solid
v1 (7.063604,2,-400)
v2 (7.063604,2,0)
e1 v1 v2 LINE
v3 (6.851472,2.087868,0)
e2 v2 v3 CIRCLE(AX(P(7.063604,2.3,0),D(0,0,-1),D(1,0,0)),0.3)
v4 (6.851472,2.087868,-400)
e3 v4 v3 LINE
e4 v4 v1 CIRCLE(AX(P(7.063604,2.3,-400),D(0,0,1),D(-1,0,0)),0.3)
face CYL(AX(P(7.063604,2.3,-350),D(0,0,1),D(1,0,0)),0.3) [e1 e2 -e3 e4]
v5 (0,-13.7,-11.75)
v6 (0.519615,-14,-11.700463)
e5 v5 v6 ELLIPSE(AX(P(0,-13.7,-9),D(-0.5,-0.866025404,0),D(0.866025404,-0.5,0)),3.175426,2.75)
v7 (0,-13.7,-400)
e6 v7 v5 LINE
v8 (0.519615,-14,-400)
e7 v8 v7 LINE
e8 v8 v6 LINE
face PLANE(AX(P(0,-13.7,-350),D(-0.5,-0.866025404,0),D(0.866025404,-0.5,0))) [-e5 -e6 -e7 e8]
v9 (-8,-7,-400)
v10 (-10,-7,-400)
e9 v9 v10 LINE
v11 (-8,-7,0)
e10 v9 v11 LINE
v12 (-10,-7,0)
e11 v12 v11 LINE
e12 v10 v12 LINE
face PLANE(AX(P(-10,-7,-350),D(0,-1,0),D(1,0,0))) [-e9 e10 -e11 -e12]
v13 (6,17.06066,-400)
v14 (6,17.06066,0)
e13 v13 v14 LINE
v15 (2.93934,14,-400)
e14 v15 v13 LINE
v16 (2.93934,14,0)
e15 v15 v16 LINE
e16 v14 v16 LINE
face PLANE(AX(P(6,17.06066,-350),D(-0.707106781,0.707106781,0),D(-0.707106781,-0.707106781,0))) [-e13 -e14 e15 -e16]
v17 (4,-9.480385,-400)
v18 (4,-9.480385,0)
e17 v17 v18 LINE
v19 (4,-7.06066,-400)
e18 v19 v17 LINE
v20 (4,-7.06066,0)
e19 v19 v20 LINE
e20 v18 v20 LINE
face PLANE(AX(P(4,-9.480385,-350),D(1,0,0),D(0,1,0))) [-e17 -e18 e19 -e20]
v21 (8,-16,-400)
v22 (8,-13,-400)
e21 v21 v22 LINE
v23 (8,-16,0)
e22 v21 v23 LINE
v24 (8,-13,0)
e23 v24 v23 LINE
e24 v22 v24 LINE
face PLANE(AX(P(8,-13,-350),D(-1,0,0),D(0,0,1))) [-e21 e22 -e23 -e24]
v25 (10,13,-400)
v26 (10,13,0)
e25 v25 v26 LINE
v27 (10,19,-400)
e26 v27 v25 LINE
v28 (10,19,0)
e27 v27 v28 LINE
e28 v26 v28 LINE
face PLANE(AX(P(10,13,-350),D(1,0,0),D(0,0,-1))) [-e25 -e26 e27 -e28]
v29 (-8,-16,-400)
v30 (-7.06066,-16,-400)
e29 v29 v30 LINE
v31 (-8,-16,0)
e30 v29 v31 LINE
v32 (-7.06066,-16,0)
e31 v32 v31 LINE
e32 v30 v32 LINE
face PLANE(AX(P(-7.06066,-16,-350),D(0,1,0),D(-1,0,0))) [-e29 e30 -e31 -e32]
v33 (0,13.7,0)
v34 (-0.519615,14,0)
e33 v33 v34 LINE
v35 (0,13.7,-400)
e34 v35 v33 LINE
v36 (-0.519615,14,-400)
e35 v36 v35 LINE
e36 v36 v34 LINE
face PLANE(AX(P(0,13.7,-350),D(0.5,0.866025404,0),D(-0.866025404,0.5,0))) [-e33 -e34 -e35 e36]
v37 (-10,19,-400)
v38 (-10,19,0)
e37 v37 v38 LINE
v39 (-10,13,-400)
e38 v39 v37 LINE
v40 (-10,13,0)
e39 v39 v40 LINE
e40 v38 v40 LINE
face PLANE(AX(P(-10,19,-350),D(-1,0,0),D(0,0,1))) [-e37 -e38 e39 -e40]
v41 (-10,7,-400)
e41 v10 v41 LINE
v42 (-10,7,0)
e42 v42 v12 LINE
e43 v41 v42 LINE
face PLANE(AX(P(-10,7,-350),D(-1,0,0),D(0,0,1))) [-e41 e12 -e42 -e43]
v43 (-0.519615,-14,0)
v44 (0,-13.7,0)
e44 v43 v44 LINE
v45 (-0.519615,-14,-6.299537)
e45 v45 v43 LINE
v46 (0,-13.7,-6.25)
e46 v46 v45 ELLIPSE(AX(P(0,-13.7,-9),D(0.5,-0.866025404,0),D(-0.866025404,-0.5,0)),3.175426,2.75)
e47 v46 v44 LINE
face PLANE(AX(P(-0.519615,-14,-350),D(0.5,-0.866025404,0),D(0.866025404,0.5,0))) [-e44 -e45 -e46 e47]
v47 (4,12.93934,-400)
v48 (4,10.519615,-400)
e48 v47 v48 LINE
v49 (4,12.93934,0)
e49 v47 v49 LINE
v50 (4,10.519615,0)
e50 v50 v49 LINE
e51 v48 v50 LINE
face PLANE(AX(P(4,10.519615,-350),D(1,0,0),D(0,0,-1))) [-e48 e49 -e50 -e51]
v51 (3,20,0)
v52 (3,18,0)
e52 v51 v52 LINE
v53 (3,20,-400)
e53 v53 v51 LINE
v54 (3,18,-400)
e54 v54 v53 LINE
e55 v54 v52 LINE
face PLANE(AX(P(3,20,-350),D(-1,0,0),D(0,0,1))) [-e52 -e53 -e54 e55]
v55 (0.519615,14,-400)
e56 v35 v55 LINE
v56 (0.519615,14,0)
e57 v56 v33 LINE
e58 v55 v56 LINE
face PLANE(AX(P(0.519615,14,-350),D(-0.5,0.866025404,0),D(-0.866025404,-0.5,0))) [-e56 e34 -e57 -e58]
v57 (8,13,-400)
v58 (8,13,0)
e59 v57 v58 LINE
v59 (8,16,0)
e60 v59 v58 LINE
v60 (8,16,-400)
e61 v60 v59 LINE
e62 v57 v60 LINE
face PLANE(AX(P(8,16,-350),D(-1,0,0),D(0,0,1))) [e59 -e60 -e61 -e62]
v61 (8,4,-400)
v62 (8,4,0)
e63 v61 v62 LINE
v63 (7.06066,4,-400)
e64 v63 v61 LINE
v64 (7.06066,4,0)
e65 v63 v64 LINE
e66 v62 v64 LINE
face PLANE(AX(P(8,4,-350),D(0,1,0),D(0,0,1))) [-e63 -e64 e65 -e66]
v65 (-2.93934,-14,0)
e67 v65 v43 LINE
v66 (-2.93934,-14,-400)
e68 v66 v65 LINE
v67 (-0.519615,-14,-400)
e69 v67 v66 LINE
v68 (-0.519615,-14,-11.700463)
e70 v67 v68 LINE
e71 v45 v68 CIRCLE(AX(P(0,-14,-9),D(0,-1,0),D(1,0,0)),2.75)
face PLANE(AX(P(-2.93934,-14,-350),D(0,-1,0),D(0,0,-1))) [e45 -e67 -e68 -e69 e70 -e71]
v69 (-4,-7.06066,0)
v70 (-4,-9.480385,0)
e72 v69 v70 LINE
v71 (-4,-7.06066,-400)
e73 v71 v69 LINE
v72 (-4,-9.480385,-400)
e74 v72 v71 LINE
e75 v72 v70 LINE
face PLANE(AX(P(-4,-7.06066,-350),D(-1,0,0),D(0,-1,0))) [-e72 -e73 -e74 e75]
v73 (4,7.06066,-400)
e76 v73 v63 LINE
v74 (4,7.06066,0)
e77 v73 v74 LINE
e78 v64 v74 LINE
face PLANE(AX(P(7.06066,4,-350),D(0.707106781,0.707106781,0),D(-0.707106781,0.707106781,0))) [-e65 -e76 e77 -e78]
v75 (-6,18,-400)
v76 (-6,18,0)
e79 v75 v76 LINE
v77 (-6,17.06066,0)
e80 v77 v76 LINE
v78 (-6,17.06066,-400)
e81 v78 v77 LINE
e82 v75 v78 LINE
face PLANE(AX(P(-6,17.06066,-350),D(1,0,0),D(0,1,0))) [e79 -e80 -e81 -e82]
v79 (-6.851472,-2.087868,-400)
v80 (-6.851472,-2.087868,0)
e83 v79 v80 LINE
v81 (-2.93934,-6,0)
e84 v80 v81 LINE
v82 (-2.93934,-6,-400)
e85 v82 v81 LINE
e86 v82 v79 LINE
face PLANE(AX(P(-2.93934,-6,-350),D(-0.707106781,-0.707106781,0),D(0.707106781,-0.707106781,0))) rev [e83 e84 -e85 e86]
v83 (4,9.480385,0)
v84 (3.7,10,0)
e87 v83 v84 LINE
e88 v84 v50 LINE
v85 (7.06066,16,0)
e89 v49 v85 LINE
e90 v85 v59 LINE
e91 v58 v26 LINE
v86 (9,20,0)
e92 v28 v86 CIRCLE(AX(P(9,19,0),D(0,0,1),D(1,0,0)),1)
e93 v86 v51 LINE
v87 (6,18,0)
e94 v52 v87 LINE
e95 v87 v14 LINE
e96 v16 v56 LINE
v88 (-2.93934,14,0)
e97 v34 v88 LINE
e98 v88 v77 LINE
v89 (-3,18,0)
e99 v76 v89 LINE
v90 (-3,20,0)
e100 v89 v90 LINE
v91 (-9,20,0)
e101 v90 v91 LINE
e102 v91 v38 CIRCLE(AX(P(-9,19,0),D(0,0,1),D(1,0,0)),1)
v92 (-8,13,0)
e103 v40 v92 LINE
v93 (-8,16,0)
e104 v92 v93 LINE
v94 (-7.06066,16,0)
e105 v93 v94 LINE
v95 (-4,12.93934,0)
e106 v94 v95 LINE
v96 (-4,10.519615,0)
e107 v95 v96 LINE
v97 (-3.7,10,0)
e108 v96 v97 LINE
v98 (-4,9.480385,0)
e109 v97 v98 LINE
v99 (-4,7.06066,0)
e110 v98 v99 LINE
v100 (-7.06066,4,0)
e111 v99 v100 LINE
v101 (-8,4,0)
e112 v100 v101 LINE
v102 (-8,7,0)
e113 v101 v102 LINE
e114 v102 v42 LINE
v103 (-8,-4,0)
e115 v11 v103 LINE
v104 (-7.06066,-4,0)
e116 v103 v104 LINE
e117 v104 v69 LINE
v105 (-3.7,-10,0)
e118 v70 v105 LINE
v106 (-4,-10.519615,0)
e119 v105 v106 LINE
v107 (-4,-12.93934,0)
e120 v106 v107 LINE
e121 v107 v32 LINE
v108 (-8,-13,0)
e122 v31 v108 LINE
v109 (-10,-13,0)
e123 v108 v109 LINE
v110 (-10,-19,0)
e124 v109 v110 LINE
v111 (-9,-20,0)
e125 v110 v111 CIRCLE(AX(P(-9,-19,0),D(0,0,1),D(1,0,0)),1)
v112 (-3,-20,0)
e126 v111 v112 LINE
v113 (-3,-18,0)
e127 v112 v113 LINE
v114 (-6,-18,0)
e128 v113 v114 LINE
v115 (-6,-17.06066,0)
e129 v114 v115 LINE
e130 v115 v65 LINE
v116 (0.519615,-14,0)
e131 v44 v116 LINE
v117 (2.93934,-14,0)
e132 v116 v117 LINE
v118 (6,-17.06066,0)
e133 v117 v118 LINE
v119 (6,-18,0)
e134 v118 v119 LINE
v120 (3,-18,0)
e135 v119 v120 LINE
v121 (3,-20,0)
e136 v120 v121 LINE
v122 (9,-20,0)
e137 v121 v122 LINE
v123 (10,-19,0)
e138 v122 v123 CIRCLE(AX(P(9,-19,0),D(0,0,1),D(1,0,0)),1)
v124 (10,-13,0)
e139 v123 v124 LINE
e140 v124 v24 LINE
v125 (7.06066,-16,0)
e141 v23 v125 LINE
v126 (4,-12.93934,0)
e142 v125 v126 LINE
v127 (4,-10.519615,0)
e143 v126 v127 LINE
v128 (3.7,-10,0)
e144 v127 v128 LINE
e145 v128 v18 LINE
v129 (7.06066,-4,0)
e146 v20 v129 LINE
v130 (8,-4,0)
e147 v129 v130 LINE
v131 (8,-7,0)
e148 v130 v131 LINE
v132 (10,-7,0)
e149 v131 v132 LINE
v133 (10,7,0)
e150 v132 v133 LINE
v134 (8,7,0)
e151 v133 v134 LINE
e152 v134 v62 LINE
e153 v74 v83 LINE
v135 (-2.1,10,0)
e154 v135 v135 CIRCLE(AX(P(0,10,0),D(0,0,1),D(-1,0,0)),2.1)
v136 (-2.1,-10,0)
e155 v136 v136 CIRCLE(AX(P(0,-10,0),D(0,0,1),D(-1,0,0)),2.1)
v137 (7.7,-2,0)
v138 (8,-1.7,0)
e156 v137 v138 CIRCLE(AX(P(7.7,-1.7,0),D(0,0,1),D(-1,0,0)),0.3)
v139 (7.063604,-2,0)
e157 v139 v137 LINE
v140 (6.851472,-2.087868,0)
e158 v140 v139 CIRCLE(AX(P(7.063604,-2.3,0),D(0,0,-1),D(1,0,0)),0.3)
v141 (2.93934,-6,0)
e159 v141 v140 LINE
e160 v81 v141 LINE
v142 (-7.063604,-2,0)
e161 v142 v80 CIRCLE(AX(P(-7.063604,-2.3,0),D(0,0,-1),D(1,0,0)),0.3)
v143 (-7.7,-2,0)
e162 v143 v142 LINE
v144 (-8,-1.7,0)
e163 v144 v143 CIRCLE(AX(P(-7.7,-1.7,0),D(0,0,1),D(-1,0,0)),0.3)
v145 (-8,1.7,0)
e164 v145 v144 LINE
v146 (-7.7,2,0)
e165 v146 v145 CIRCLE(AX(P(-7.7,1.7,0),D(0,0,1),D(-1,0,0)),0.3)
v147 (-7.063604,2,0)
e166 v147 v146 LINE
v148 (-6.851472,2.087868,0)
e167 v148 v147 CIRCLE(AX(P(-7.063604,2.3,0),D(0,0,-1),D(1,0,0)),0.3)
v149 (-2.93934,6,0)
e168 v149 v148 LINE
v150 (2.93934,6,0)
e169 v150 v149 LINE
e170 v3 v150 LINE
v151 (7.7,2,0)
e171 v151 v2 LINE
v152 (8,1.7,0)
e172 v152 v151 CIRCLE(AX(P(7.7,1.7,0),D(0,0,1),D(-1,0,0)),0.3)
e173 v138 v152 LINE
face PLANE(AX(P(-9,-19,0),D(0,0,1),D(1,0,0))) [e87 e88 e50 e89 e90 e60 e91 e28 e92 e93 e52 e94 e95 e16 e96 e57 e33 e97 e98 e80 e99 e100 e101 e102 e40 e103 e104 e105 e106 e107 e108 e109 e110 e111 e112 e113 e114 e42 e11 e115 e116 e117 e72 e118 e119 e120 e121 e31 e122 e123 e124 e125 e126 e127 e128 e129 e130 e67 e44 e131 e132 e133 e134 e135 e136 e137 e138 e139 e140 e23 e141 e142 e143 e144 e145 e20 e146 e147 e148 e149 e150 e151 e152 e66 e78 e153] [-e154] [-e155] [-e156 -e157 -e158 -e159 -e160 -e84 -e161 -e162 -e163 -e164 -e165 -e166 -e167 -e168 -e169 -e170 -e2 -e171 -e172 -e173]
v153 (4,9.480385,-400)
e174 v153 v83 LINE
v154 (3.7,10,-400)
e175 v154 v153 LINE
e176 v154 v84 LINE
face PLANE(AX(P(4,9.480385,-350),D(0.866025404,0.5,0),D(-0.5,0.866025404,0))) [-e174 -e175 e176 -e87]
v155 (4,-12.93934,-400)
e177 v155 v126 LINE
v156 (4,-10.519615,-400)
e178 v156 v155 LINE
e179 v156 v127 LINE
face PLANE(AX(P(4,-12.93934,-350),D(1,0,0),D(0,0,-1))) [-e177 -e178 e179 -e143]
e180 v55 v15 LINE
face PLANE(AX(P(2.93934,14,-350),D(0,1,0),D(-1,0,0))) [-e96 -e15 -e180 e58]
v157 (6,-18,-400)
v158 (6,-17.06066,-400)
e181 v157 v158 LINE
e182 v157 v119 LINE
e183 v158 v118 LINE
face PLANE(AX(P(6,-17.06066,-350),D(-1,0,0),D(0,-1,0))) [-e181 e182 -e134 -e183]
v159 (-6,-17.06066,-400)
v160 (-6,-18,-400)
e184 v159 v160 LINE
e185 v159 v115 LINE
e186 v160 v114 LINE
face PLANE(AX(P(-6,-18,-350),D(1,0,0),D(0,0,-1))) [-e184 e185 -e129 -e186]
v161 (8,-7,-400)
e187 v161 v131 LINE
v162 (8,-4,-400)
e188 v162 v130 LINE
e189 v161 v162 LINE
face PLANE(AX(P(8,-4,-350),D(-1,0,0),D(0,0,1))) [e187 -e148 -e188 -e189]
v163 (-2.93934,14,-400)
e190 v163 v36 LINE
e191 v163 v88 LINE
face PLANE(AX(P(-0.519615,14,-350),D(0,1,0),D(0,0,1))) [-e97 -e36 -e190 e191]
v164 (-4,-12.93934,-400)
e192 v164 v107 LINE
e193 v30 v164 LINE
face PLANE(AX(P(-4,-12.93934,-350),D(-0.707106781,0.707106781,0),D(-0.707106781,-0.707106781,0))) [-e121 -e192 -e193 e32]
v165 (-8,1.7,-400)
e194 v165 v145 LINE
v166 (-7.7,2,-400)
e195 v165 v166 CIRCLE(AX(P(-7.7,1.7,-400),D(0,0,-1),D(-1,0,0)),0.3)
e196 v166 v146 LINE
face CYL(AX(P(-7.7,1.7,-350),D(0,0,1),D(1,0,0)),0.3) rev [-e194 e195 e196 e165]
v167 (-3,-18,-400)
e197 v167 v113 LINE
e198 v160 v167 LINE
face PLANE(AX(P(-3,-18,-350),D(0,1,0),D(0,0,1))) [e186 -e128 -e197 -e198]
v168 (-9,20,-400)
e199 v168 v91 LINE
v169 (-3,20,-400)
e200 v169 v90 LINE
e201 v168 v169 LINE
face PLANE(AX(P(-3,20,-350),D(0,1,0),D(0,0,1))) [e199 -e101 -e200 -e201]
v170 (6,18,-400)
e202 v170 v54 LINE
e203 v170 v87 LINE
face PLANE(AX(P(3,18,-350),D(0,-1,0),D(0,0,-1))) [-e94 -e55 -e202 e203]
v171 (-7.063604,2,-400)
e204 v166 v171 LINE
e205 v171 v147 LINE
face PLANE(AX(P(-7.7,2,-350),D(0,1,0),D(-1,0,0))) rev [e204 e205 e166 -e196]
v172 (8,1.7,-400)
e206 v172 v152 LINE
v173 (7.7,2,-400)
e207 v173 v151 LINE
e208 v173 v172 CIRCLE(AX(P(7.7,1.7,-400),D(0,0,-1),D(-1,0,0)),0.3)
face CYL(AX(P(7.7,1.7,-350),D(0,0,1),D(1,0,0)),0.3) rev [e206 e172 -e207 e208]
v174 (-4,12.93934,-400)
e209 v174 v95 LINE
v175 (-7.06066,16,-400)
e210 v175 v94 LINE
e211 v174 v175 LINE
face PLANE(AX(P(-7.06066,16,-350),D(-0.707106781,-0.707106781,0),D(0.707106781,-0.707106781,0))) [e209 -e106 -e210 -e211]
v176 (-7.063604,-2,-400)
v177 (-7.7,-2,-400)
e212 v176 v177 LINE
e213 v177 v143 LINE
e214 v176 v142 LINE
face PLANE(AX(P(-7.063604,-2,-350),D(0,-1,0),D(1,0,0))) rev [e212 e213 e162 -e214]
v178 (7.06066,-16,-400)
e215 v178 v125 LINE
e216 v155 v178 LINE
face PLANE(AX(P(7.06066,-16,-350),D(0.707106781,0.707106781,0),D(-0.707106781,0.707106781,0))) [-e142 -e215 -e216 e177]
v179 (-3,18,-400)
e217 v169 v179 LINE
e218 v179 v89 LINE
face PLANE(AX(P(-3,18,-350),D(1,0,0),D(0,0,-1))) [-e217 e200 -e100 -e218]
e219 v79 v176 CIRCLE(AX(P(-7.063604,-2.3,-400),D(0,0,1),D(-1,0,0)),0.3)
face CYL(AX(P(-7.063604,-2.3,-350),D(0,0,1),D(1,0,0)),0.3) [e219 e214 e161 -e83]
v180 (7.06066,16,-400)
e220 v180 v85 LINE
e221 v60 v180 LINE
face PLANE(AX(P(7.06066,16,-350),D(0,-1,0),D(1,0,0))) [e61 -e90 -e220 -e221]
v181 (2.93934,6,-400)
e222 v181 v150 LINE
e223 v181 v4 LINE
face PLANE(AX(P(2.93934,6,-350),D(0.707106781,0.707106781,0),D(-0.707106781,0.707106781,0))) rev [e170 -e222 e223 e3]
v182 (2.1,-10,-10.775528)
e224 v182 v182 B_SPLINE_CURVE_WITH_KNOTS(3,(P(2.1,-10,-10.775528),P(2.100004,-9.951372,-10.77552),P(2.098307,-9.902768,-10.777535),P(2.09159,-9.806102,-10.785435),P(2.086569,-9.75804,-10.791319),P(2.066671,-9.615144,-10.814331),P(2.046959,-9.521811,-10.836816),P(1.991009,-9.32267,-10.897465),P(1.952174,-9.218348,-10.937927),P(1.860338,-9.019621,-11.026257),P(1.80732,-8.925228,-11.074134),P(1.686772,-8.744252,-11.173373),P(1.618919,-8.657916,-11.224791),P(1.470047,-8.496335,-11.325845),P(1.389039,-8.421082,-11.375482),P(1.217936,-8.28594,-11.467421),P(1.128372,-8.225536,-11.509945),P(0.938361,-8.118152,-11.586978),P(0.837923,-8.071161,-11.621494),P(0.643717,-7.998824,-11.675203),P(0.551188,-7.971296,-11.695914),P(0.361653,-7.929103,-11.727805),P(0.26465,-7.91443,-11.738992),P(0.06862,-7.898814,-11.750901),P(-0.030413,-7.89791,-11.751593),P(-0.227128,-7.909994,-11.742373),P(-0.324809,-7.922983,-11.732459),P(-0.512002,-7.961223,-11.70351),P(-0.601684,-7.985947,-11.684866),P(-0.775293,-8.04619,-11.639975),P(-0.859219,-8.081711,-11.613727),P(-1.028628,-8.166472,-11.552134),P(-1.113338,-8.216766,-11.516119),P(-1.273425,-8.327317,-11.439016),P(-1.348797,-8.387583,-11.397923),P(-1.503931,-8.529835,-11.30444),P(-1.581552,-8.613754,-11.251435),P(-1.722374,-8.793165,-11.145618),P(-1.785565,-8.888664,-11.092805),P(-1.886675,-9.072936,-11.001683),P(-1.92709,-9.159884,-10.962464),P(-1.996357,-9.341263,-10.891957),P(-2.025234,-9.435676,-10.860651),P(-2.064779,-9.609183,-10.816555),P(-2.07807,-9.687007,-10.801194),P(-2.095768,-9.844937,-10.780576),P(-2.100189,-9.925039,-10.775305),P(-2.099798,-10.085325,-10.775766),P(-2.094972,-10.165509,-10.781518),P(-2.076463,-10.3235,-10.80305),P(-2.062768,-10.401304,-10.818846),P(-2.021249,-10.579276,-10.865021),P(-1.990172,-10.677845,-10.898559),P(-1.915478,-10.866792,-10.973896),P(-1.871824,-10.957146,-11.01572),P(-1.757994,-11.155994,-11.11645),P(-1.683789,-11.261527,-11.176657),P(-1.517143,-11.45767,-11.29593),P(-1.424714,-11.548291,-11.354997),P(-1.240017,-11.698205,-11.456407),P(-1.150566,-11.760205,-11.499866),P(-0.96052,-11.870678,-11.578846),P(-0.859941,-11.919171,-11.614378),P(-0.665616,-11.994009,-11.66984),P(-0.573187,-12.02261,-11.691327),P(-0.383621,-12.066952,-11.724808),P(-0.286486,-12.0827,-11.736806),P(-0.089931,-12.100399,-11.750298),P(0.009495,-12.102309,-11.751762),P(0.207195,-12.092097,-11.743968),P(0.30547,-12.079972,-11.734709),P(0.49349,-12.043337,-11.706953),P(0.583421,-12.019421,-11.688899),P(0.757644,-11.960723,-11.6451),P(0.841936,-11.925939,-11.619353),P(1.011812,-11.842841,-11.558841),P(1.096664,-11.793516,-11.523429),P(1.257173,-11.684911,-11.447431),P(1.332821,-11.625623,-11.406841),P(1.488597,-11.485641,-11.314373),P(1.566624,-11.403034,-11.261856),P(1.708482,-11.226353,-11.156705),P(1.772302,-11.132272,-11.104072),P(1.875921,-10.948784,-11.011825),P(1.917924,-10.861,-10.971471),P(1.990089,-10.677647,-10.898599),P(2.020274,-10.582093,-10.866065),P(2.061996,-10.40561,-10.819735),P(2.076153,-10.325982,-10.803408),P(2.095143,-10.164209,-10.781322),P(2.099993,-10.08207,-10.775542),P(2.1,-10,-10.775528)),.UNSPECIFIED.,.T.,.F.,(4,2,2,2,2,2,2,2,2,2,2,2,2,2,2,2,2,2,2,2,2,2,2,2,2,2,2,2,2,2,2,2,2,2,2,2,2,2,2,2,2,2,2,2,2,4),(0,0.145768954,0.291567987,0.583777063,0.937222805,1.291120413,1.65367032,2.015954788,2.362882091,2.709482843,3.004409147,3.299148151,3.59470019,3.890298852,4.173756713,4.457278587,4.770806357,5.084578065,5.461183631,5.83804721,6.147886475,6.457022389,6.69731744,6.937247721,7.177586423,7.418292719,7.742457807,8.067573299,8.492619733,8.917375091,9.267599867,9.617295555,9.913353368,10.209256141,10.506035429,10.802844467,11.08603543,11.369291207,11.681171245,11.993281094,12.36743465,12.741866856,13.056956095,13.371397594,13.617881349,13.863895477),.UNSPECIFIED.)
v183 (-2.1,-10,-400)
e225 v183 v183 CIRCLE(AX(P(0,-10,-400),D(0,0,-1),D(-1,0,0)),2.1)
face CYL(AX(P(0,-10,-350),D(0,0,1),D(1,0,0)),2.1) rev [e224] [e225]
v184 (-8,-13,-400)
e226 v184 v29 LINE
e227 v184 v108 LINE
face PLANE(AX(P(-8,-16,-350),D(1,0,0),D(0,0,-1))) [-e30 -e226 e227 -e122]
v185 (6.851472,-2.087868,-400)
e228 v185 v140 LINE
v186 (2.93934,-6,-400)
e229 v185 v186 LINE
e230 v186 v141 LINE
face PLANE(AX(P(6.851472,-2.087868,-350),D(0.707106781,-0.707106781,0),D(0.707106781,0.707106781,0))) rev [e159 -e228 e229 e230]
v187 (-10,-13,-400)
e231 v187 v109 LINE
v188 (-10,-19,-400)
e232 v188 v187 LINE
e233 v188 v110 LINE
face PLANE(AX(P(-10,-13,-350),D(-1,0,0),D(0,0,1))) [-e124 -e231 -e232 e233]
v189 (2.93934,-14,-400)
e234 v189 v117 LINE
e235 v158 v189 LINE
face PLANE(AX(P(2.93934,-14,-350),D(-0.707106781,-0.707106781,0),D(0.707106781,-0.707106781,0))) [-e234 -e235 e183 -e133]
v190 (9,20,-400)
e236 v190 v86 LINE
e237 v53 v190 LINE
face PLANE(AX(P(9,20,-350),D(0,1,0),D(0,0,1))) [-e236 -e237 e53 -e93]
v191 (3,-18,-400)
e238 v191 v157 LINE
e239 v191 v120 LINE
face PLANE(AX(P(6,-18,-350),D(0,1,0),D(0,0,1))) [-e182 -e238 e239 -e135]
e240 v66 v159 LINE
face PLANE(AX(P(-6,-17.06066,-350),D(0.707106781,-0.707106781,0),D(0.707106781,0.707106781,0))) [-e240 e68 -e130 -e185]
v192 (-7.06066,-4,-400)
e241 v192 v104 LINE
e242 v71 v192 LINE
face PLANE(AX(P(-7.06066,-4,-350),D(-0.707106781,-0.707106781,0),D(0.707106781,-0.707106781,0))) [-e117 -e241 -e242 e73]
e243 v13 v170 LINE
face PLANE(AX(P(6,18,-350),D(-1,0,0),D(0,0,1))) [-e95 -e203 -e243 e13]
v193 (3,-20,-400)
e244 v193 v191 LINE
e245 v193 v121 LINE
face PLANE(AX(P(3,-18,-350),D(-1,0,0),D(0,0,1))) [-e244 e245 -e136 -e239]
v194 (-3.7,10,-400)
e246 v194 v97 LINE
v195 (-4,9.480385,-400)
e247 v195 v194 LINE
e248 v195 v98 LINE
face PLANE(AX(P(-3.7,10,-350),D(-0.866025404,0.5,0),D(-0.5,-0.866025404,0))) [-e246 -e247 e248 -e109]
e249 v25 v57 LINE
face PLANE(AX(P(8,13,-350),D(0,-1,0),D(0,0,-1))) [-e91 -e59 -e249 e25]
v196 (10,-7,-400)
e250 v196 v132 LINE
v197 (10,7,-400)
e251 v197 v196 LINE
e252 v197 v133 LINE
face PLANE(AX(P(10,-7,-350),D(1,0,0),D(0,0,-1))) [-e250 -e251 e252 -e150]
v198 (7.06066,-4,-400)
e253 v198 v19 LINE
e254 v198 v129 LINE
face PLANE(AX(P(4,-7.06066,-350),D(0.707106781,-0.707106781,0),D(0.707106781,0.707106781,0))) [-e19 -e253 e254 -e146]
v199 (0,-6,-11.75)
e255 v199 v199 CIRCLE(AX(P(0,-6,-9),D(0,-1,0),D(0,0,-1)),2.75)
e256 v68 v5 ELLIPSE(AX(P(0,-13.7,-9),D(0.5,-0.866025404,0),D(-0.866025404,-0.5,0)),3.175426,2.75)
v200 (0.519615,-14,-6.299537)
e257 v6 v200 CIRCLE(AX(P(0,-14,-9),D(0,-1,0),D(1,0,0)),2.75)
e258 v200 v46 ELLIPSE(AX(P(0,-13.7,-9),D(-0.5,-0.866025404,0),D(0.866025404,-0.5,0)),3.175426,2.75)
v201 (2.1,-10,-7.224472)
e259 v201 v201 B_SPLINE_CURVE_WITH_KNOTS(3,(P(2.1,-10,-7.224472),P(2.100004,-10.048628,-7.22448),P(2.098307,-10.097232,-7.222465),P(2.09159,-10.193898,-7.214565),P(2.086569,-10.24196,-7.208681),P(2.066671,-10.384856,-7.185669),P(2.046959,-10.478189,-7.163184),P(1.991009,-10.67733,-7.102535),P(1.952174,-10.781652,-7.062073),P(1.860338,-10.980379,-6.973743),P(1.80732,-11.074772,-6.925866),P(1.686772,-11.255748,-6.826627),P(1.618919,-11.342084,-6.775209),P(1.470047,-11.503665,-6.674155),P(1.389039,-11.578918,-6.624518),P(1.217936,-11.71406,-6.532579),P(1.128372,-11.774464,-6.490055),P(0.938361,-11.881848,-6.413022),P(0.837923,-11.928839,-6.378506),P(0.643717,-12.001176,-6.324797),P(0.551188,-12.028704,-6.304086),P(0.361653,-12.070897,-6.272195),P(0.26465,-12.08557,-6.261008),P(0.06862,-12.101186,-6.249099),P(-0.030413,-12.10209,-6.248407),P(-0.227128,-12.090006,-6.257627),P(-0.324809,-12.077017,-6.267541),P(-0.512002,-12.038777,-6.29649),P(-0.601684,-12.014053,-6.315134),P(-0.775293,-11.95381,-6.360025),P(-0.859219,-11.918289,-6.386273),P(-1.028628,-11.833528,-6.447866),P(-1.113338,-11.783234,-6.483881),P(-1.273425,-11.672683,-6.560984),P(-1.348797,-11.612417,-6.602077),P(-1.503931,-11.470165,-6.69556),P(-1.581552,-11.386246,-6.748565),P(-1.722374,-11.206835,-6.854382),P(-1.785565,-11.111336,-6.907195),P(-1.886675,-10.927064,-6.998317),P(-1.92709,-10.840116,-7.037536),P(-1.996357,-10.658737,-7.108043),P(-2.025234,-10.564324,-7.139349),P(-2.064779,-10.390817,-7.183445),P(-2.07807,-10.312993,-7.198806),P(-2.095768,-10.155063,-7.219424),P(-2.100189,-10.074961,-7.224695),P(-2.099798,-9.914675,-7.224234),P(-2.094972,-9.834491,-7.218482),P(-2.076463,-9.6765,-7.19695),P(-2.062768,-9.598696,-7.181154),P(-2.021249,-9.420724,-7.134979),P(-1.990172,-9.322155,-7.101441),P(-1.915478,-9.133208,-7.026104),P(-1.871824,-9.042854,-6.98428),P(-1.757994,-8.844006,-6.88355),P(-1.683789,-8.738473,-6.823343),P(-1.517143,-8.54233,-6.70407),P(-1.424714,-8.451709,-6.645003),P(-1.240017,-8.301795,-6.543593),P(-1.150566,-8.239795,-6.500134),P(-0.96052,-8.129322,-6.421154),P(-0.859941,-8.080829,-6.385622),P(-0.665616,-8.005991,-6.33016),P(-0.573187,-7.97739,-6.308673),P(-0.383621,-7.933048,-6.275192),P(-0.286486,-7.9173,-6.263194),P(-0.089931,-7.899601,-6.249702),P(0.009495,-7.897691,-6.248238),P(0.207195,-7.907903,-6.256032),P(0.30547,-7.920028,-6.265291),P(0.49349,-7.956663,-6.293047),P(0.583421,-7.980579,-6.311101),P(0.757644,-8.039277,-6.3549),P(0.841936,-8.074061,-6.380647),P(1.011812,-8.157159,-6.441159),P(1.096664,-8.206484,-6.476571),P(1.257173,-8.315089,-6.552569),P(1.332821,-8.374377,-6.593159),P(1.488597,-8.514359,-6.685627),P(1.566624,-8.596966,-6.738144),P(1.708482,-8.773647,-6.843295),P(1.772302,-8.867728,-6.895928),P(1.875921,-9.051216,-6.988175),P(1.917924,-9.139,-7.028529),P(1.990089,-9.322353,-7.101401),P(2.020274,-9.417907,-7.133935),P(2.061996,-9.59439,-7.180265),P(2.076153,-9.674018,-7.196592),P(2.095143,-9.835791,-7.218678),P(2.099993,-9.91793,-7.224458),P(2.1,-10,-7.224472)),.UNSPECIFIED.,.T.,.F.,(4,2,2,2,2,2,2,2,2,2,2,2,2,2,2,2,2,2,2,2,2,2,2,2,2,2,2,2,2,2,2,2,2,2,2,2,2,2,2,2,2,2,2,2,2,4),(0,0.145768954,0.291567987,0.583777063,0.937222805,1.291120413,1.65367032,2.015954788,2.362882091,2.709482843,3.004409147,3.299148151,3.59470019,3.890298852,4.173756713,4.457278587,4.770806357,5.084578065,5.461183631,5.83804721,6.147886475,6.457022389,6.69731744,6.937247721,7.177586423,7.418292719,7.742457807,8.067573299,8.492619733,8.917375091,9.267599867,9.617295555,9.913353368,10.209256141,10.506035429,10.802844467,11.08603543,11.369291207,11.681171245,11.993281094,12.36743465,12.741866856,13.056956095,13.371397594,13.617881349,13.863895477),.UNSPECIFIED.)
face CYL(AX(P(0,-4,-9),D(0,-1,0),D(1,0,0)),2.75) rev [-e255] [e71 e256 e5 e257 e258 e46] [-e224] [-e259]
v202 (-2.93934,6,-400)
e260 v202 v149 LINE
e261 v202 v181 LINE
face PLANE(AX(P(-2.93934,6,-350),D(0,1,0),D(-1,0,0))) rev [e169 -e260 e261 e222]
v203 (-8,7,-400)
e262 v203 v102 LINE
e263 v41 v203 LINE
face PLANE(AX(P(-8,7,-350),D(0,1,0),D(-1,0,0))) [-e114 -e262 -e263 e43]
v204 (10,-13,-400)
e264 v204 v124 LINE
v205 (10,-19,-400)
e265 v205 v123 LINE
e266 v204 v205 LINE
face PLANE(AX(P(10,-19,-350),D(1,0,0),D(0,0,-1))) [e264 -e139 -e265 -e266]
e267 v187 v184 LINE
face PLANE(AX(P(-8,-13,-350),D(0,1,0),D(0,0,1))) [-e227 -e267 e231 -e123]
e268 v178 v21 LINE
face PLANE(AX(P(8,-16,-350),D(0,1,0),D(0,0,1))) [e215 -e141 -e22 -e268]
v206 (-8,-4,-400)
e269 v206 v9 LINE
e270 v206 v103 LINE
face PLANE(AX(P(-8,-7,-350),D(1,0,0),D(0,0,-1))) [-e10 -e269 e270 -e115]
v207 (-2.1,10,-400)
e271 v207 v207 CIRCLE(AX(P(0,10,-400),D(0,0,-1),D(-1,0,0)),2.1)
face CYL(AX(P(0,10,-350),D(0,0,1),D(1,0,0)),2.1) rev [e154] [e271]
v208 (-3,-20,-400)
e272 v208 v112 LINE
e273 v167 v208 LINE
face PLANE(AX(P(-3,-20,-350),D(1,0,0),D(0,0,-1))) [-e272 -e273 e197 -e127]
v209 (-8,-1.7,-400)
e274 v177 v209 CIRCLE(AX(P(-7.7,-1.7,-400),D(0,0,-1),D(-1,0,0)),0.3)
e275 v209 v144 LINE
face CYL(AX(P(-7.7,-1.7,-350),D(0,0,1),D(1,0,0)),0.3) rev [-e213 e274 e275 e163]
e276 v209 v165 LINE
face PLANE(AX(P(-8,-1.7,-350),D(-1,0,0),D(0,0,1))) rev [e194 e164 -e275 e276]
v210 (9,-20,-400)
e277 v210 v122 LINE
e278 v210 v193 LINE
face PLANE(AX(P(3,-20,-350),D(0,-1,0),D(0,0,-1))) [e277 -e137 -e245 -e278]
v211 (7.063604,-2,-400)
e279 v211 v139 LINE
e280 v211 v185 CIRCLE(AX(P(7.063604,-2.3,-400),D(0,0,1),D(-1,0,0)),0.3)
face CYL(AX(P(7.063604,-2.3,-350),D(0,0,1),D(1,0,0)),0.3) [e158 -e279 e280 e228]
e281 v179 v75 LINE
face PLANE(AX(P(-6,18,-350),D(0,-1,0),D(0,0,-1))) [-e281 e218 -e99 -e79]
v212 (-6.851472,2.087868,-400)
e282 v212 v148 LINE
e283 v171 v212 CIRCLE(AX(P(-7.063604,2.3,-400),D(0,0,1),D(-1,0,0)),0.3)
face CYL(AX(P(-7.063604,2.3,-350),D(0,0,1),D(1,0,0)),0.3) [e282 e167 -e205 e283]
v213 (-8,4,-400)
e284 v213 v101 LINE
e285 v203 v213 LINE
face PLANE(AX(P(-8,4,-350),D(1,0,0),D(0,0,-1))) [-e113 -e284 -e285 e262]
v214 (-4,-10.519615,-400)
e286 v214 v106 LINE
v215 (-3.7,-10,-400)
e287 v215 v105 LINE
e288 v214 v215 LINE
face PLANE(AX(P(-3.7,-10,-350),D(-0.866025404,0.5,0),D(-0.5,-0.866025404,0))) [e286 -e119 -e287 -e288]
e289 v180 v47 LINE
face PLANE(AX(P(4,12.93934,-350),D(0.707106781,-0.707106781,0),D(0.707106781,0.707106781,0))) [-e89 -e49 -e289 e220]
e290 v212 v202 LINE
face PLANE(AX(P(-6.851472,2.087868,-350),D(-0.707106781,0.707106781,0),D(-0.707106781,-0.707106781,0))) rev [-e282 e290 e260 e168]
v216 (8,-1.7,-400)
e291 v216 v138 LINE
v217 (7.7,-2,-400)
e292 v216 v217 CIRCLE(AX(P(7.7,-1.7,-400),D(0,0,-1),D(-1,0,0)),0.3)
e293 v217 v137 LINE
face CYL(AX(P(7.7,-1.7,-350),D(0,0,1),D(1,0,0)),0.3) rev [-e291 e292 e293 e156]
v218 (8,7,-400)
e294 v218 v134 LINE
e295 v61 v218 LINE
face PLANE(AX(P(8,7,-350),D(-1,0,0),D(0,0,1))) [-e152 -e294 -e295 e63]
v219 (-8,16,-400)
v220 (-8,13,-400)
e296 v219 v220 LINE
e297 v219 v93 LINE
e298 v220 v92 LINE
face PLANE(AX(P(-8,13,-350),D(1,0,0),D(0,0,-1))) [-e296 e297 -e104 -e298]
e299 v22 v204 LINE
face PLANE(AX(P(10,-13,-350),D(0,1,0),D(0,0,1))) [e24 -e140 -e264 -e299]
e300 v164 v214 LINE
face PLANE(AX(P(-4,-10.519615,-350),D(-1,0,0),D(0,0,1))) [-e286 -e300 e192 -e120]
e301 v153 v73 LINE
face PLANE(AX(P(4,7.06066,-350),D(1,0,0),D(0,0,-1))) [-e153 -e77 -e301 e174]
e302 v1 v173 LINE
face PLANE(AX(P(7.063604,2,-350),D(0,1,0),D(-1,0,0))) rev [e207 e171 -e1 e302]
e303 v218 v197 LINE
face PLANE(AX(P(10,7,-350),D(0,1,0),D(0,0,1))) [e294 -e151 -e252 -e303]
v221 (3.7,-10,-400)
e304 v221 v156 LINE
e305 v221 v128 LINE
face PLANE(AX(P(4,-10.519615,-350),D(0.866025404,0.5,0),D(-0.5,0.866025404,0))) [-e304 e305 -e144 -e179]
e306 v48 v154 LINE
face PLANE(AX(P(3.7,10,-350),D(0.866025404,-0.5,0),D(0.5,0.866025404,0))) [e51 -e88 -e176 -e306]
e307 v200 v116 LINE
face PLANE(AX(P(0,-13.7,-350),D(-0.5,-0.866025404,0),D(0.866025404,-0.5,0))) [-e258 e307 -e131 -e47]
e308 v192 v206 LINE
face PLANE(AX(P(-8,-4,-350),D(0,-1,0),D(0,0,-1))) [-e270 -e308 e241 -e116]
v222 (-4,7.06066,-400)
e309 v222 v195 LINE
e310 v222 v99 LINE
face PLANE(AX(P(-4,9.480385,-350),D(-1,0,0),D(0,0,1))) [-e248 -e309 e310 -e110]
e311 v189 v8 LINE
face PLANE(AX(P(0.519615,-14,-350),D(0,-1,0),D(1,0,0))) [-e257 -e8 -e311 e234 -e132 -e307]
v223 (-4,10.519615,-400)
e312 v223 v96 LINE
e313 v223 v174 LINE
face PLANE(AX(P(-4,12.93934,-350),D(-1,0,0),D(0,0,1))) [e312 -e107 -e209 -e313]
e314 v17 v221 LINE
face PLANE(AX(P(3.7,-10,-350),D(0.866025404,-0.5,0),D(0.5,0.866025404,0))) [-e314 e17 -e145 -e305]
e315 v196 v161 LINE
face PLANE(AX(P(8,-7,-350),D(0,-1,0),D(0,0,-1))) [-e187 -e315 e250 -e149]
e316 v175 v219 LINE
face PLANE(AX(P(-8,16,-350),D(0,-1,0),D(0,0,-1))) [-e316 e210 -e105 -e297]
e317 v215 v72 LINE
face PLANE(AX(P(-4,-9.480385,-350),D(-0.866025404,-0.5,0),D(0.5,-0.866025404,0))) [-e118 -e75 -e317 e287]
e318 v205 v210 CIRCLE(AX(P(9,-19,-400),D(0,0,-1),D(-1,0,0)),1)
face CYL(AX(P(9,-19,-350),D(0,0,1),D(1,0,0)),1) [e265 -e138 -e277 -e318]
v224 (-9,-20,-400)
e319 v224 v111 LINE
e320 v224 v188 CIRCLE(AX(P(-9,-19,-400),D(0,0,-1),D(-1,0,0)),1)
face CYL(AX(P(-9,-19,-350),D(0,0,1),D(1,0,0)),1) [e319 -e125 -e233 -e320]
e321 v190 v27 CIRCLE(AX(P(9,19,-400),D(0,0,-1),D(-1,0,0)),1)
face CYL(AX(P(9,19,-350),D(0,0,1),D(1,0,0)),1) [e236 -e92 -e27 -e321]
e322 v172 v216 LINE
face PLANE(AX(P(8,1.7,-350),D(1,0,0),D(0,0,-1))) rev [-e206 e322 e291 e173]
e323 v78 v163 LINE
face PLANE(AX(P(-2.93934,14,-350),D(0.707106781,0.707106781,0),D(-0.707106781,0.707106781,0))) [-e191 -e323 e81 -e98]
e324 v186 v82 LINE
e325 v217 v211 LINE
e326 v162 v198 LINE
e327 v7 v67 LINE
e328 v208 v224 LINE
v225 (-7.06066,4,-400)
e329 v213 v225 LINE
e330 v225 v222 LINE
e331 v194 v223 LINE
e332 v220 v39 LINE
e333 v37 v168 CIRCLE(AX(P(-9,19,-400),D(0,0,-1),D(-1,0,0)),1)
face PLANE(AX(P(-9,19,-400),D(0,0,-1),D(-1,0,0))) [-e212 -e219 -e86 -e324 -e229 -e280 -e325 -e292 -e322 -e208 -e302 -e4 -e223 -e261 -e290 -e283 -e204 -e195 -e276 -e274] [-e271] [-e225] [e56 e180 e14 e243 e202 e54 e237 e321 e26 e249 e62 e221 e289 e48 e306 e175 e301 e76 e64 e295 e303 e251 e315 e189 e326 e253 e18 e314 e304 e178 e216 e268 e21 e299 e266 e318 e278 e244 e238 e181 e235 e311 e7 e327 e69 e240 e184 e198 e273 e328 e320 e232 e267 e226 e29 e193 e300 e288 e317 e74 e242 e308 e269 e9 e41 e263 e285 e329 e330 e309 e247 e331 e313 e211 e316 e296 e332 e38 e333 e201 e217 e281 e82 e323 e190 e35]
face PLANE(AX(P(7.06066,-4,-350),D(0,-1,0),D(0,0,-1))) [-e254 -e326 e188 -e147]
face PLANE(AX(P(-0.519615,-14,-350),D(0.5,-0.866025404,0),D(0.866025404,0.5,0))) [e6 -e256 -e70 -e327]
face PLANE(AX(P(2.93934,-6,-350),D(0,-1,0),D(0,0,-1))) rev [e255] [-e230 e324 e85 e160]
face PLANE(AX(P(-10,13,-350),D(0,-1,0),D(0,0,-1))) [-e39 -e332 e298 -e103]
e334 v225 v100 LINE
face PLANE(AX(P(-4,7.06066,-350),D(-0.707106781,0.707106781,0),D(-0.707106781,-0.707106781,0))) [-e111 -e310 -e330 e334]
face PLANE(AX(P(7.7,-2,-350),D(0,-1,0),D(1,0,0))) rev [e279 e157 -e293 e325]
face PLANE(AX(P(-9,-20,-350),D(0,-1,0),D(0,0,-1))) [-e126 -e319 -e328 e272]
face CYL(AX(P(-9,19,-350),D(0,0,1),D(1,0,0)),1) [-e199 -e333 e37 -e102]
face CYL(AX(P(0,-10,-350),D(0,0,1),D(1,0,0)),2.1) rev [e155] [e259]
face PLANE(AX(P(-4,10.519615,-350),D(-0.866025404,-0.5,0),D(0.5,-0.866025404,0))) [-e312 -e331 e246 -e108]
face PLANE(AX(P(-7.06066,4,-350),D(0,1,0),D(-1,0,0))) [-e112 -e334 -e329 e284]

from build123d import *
from build123d.topology import SkipClean

# Parameters (mm, degrees)
SKETCH1_R           = 2.1
BOSS_EXTRUDE1_DEPTH = 350
SKETCH3_R           = 2.75
CUT_EXTRUDE1_DEPTH  = 10
SKETCH4_R           = 2.1
BOSS_EXTRUDE2_DEPTH = 50


with BuildPart() as part:
    # Sketch1 → Boss-Extrude1 (new body)
    with BuildSketch(Plane.XY):
        with BuildLine():
            Line((-8, 4), (-8, 7))
            Line((-8, 7), (-10, 7))
            Line((-10, 7), (-10, -7))
            Line((-10, -7), (-8, -7))
            Line((-8, -7), (-8, -4))
            Line((-8, -4), (-7.060660172, -4))
            Line((-7.060660172, -4), (-4, -7.060660172))
            Line((-4, -7.060660172), (-4, -9.480384758))
            Line((-4, -9.480384758), (-3.7, -10))
            Line((-3.7, -10), (-4, -10.519615242))
            Line((-4, -10.519615242), (-4, -12.939339828))
            Line((-4, -12.939339828), (-7.060660172, -16))
            Line((-7.060660172, -16), (-8, -16))
            Line((-8, -16), (-8, -13))
            Line((-8, -13), (-10, -13))
            Line((-10, -13), (-10, -19))
            ThreePointArc((-10, -19), (-9.707106781, -19.707106781), (-9, -20))
            Line((-9, -20), (-3, -20))
            Line((-3, -20), (-3, -18))
            Line((-3, -18), (-6, -18))
            Line((-6, -18), (-6, -17.060660172))
            Line((-6, -17.060660172), (-2.939339828, -14))
            Line((-2.939339828, -14), (-0.519615242, -14))
            Line((-0.519615242, -14), (0, -13.7))
            Line((0, -13.7), (0.519615242, -14))
            Line((0.519615242, -14), (2.939339828, -14))
            Line((2.939339828, -14), (6, -17.060660172))
            Line((6, -17.060660172), (6, -18))
            Line((6, -18), (3, -18))
            Line((3, -18), (3, -20))
            Line((3, -20), (9, -20))
            ThreePointArc((9, -20), (9.707106781, -19.707106781), (10, -19))
            Line((10, -19), (10, -13))
            Line((10, -13), (8, -13))
            Line((8, -13), (8, -16))
            Line((8, -16), (7.060660172, -16))
            Line((7.060660172, -16), (4, -12.939339828))
            Line((4, -12.939339828), (4, -10.519615242))
            Line((4, -10.519615242), (3.7, -10))
            Line((3.7, -10), (4, -9.480384758))
            Line((4, -9.480384758), (4, -7.060660172))
            Line((4, -7.060660172), (7.060660172, -4))
            Line((7.060660172, -4), (8, -4))
            Line((8, -4), (8, -7))
            Line((8, -7), (10, -7))
            Line((10, -7), (10, 7))
            Line((10, 7), (8, 7))
            Line((8, 7), (8, 4))
            Line((8, 4), (7.060660172, 4))
            Line((7.060660172, 4), (4, 7.060660172))
            Line((4, 7.060660172), (4, 9.480384758))
            Line((4, 9.480384758), (3.7, 10))
            Line((3.7, 10), (4, 10.519615242))
            Line((4, 10.519615242), (4, 12.939339828))
            Line((4, 12.939339828), (7.060660172, 16))
            Line((7.060660172, 16), (8, 16))
            Line((8, 16), (8, 13))
            Line((8, 13), (10, 13))
            Line((10, 13), (10, 19))
            ThreePointArc((10, 19), (9.707106781, 19.707106781), (9, 20))
            Line((9, 20), (3, 20))
            Line((3, 20), (3, 18))
            Line((3, 18), (6, 18))
            Line((6, 18), (6, 17.060660172))
            Line((6, 17.060660172), (2.939339828, 14))
            Line((2.939339828, 14), (0.519615242, 14))
            Line((0.519615242, 14), (0, 13.7))
            Line((0, 13.7), (-0.519615242, 14))
            Line((-0.519615242, 14), (-2.939339828, 14))
            Line((-2.939339828, 14), (-6, 17.060660172))
            Line((-6, 17.060660172), (-6, 18))
            Line((-6, 18), (-3, 18))
            Line((-3, 18), (-3, 20))
            Line((-3, 20), (-9, 20))
            ThreePointArc((-9, 20), (-9.707106781, 19.707106781), (-10, 19))
            Line((-10, 19), (-10, 13))
            Line((-10, 13), (-8, 13))
            Line((-8, 13), (-8, 16))
            Line((-8, 16), (-7.060660172, 16))
            Line((-7.060660172, 16), (-4, 12.939339828))
            Line((-4, 12.939339828), (-4, 10.519615242))
            Line((-4, 10.519615242), (-3.7, 10))
            Line((-3.7, 10), (-4, 9.480384758))
            Line((-4, 9.480384758), (-4, 7.060660172))
            Line((-4, 7.060660172), (-7.060660172, 4))
            Line((-7.060660172, 4), (-8, 4))
        make_face()
        with Locations((0, 10)):
            Circle(SKETCH1_R, mode=Mode.SUBTRACT)
        with Locations((0, -10)):
            Circle(SKETCH1_R, mode=Mode.SUBTRACT)
        with BuildLine():
            Line((-8, -1.7), (-8, 1.7))
            ThreePointArc((-8, 1.7), (-7.912132034, 1.912132034), (-7.7, 2))
            Line((-7.7, 2), (-7.063603897, 2))
            ThreePointArc((-7.063603897, 2), (-6.948798867, 2.02283614), (-6.851471863, 2.087867966))
            Line((-6.851471863, 2.087867966), (-2.939339828, 6))
            Line((-2.939339828, 6), (2.939339828, 6))
            Line((2.939339828, 6), (6.851471863, 2.087867966))
            ThreePointArc((6.851471863, 2.087867966), (6.948798867, 2.02283614), (7.063603897, 2))
            Line((7.063603897, 2), (7.7, 2))
            ThreePointArc((7.7, 2), (7.912132034, 1.912132034), (8, 1.7))
            Line((8, 1.7), (8, -1.7))
            ThreePointArc((8, -1.7), (7.912132034, -1.912132034), (7.7, -2))
            Line((7.7, -2), (7.063603897, -2))
            ThreePointArc((7.063603897, -2), (6.948798867, -2.02283614), (6.851471863, -2.087867966))
            Line((6.851471863, -2.087867966), (2.939339828, -6))
            Line((2.939339828, -6), (-2.939339828, -6))
            Line((-2.939339828, -6), (-6.851471863, -2.087867966))
            ThreePointArc((-6.851471863, -2.087867966), (-6.948798867, -2.02283614), (-7.063603897, -2))
            Line((-7.063603897, -2), (-7.7, -2))
            ThreePointArc((-7.7, -2), (-7.912132034, -1.912132034), (-8, -1.7))
        make_face(mode=Mode.SUBTRACT)
    extrude(amount=-BOSS_EXTRUDE1_DEPTH)

    # Sketch3 → Cut-Extrude1 (cut)
    with BuildSketch(Plane.XZ.offset(14)):
        with Locations((0, -9)):
            Circle(SKETCH3_R)
    extrude(amount=-CUT_EXTRUDE1_DEPTH, mode=Mode.SUBTRACT)

    # Sketch4 → Boss-Extrude2 (add)
    with SkipClean():  # the faces are left unmerged after this step: merging them gives an invalid solid
        with BuildSketch(Plane(origin=(0, 0, -350), x_dir=(-1, 0, 0), z_dir=(0, 0, -1))):
            with BuildLine():
                Line((8, 4), (7.060660172, 4))
                Line((7.060660172, 4), (4, 7.060660172))
                Line((4, 7.060660172), (4, 9.480384758))
                Line((4, 9.480384758), (3.7, 10))
                Line((3.7, 10), (4, 10.519615242))
                Line((4, 10.519615242), (4, 12.939339828))
                Line((4, 12.939339828), (7.060660172, 16))
                Line((7.060660172, 16), (8, 16))
                Line((8, 16), (8, 13))
                Line((8, 13), (10, 13))
                Line((10, 13), (10, 19))
                ThreePointArc((10, 19), (9.707106781, 19.707106781), (9, 20))
                Line((9, 20), (3, 20))
                Line((3, 20), (3, 18))
                Line((3, 18), (6, 18))
                Line((6, 18), (6, 17.060660172))
                Line((6, 17.060660172), (2.939339828, 14))
                Line((2.939339828, 14), (0.519615242, 14))
                Line((0.519615242, 14), (0, 13.7))
                Line((0, 13.7), (-0.519615242, 14))
                Line((-0.519615242, 14), (-2.939339828, 14))
                Line((-2.939339828, 14), (-6, 17.060660172))
                Line((-6, 17.060660172), (-6, 18))
                Line((-6, 18), (-3, 18))
                Line((-3, 18), (-3, 20))
                Line((-3, 20), (-9, 20))
                ThreePointArc((-9, 20), (-9.707106781, 19.707106781), (-10, 19))
                Line((-10, 19), (-10, 13))
                Line((-10, 13), (-8, 13))
                Line((-8, 13), (-8, 16))
                Line((-8, 16), (-7.060660172, 16))
                Line((-7.060660172, 16), (-4, 12.939339828))
                Line((-4, 12.939339828), (-4, 10.519615242))
                Line((-4, 10.519615242), (-3.7, 10))
                Line((-3.7, 10), (-4, 9.480384758))
                Line((-4, 9.480384758), (-4, 7.060660172))
                Line((-4, 7.060660172), (-7.060660172, 4))
                Line((-7.060660172, 4), (-8, 4))
                Line((-8, 4), (-8, 7))
                Line((-8, 7), (-10, 7))
                Line((-10, 7), (-10, -7))
                Line((-10, -7), (-8, -7))
                Line((-8, -7), (-8, -4))
                Line((-8, -4), (-7.060660172, -4))
                Line((-7.060660172, -4), (-4, -7.060660172))
                Line((-4, -7.060660172), (-4, -9.480384758))
                Line((-4, -9.480384758), (-3.7, -10))
                Line((-3.7, -10), (-4, -10.519615242))
                Line((-4, -10.519615242), (-4, -12.939339828))
                Line((-4, -12.939339828), (-7.060660172, -16))
                Line((-7.060660172, -16), (-8, -16))
                Line((-8, -16), (-8, -13))
                Line((-8, -13), (-10, -13))
                Line((-10, -13), (-10, -19))
                ThreePointArc((-10, -19), (-9.707106781, -19.707106781), (-9, -20))
                Line((-9, -20), (-3, -20))
                Line((-3, -20), (-3, -18))
                Line((-3, -18), (-6, -18))
                Line((-6, -18), (-6, -17.060660172))
                Line((-6, -17.060660172), (-2.939339828, -14))
                Line((-2.939339828, -14), (-0.519615242, -14))
                Line((-0.519615242, -14), (0, -13.7))
                Line((0, -13.7), (0.519615242, -14))
                Line((0.519615242, -14), (2.939339828, -14))
                Line((2.939339828, -14), (6, -17.060660172))
                Line((6, -17.060660172), (6, -18))
                Line((6, -18), (3, -18))
                Line((3, -18), (3, -20))
                Line((3, -20), (9, -20))
                ThreePointArc((9, -20), (9.707106781, -19.707106781), (10, -19))
                Line((10, -19), (10, -13))
                Line((10, -13), (8, -13))
                Line((8, -13), (8, -16))
                Line((8, -16), (7.060660172, -16))
                Line((7.060660172, -16), (4, -12.939339828))
                Line((4, -12.939339828), (4, -10.519615242))
                Line((4, -10.519615242), (3.7, -10))
                Line((3.7, -10), (4, -9.480384758))
                Line((4, -9.480384758), (4, -7.060660172))
                Line((4, -7.060660172), (7.060660172, -4))
                Line((7.060660172, -4), (8, -4))
                Line((8, -4), (8, -7))
                Line((8, -7), (10, -7))
                Line((10, -7), (10, 7))
                Line((10, 7), (8, 7))
                Line((8, 7), (8, 4))
            make_face()
            with Locations((0, 10)):
                Circle(SKETCH4_R, mode=Mode.SUBTRACT)
            with Locations((0, -10)):
                Circle(SKETCH4_R, mode=Mode.SUBTRACT)
            with BuildLine():
                Line((-2.939339828, 6), (2.939339828, 6))
                Line((2.939339828, 6), (6.851471863, 2.087867966))
                ThreePointArc((6.851471863, 2.087867966), (6.948798867, 2.02283614), (7.063603897, 2))
                Line((7.063603897, 2), (7.7, 2))
                ThreePointArc((7.7, 2), (7.912132034, 1.912132034), (8, 1.7))
                Line((8, 1.7), (8, -1.7))
                ThreePointArc((8, -1.7), (7.912132034, -1.912132034), (7.7, -2))
                Line((7.7, -2), (7.063603897, -2))
                ThreePointArc((7.063603897, -2), (6.948798867, -2.02283614), (6.851471863, -2.087867966))
                Line((6.851471863, -2.087867966), (2.939339828, -6))
                Line((2.939339828, -6), (-2.939339828, -6))
                Line((-2.939339828, -6), (-6.851471863, -2.087867966))
                ThreePointArc((-6.851471863, -2.087867966), (-6.948798867, -2.02283614), (-7.063603897, -2))
                Line((-7.063603897, -2), (-7.7, -2))
                ThreePointArc((-7.7, -2), (-7.912132034, -1.912132034), (-8, -1.7))
                Line((-8, -1.7), (-8, 1.7))
                ThreePointArc((-8, 1.7), (-7.912132034, 1.912132034), (-7.7, 2))
                Line((-7.7, 2), (-7.063603897, 2))
                ThreePointArc((-7.063603897, 2), (-6.948798867, 2.02283614), (-6.851471863, 2.087867966))
                Line((-6.851471863, 2.087867966), (-2.939339828, 6))
            make_face(mode=Mode.SUBTRACT)
        extrude(amount=BOSS_EXTRUDE2_DEPTH)
    add(part.part.scale(1), mode=Mode.REPLACE)  # the faces are merged on a copy


solid = part.part
